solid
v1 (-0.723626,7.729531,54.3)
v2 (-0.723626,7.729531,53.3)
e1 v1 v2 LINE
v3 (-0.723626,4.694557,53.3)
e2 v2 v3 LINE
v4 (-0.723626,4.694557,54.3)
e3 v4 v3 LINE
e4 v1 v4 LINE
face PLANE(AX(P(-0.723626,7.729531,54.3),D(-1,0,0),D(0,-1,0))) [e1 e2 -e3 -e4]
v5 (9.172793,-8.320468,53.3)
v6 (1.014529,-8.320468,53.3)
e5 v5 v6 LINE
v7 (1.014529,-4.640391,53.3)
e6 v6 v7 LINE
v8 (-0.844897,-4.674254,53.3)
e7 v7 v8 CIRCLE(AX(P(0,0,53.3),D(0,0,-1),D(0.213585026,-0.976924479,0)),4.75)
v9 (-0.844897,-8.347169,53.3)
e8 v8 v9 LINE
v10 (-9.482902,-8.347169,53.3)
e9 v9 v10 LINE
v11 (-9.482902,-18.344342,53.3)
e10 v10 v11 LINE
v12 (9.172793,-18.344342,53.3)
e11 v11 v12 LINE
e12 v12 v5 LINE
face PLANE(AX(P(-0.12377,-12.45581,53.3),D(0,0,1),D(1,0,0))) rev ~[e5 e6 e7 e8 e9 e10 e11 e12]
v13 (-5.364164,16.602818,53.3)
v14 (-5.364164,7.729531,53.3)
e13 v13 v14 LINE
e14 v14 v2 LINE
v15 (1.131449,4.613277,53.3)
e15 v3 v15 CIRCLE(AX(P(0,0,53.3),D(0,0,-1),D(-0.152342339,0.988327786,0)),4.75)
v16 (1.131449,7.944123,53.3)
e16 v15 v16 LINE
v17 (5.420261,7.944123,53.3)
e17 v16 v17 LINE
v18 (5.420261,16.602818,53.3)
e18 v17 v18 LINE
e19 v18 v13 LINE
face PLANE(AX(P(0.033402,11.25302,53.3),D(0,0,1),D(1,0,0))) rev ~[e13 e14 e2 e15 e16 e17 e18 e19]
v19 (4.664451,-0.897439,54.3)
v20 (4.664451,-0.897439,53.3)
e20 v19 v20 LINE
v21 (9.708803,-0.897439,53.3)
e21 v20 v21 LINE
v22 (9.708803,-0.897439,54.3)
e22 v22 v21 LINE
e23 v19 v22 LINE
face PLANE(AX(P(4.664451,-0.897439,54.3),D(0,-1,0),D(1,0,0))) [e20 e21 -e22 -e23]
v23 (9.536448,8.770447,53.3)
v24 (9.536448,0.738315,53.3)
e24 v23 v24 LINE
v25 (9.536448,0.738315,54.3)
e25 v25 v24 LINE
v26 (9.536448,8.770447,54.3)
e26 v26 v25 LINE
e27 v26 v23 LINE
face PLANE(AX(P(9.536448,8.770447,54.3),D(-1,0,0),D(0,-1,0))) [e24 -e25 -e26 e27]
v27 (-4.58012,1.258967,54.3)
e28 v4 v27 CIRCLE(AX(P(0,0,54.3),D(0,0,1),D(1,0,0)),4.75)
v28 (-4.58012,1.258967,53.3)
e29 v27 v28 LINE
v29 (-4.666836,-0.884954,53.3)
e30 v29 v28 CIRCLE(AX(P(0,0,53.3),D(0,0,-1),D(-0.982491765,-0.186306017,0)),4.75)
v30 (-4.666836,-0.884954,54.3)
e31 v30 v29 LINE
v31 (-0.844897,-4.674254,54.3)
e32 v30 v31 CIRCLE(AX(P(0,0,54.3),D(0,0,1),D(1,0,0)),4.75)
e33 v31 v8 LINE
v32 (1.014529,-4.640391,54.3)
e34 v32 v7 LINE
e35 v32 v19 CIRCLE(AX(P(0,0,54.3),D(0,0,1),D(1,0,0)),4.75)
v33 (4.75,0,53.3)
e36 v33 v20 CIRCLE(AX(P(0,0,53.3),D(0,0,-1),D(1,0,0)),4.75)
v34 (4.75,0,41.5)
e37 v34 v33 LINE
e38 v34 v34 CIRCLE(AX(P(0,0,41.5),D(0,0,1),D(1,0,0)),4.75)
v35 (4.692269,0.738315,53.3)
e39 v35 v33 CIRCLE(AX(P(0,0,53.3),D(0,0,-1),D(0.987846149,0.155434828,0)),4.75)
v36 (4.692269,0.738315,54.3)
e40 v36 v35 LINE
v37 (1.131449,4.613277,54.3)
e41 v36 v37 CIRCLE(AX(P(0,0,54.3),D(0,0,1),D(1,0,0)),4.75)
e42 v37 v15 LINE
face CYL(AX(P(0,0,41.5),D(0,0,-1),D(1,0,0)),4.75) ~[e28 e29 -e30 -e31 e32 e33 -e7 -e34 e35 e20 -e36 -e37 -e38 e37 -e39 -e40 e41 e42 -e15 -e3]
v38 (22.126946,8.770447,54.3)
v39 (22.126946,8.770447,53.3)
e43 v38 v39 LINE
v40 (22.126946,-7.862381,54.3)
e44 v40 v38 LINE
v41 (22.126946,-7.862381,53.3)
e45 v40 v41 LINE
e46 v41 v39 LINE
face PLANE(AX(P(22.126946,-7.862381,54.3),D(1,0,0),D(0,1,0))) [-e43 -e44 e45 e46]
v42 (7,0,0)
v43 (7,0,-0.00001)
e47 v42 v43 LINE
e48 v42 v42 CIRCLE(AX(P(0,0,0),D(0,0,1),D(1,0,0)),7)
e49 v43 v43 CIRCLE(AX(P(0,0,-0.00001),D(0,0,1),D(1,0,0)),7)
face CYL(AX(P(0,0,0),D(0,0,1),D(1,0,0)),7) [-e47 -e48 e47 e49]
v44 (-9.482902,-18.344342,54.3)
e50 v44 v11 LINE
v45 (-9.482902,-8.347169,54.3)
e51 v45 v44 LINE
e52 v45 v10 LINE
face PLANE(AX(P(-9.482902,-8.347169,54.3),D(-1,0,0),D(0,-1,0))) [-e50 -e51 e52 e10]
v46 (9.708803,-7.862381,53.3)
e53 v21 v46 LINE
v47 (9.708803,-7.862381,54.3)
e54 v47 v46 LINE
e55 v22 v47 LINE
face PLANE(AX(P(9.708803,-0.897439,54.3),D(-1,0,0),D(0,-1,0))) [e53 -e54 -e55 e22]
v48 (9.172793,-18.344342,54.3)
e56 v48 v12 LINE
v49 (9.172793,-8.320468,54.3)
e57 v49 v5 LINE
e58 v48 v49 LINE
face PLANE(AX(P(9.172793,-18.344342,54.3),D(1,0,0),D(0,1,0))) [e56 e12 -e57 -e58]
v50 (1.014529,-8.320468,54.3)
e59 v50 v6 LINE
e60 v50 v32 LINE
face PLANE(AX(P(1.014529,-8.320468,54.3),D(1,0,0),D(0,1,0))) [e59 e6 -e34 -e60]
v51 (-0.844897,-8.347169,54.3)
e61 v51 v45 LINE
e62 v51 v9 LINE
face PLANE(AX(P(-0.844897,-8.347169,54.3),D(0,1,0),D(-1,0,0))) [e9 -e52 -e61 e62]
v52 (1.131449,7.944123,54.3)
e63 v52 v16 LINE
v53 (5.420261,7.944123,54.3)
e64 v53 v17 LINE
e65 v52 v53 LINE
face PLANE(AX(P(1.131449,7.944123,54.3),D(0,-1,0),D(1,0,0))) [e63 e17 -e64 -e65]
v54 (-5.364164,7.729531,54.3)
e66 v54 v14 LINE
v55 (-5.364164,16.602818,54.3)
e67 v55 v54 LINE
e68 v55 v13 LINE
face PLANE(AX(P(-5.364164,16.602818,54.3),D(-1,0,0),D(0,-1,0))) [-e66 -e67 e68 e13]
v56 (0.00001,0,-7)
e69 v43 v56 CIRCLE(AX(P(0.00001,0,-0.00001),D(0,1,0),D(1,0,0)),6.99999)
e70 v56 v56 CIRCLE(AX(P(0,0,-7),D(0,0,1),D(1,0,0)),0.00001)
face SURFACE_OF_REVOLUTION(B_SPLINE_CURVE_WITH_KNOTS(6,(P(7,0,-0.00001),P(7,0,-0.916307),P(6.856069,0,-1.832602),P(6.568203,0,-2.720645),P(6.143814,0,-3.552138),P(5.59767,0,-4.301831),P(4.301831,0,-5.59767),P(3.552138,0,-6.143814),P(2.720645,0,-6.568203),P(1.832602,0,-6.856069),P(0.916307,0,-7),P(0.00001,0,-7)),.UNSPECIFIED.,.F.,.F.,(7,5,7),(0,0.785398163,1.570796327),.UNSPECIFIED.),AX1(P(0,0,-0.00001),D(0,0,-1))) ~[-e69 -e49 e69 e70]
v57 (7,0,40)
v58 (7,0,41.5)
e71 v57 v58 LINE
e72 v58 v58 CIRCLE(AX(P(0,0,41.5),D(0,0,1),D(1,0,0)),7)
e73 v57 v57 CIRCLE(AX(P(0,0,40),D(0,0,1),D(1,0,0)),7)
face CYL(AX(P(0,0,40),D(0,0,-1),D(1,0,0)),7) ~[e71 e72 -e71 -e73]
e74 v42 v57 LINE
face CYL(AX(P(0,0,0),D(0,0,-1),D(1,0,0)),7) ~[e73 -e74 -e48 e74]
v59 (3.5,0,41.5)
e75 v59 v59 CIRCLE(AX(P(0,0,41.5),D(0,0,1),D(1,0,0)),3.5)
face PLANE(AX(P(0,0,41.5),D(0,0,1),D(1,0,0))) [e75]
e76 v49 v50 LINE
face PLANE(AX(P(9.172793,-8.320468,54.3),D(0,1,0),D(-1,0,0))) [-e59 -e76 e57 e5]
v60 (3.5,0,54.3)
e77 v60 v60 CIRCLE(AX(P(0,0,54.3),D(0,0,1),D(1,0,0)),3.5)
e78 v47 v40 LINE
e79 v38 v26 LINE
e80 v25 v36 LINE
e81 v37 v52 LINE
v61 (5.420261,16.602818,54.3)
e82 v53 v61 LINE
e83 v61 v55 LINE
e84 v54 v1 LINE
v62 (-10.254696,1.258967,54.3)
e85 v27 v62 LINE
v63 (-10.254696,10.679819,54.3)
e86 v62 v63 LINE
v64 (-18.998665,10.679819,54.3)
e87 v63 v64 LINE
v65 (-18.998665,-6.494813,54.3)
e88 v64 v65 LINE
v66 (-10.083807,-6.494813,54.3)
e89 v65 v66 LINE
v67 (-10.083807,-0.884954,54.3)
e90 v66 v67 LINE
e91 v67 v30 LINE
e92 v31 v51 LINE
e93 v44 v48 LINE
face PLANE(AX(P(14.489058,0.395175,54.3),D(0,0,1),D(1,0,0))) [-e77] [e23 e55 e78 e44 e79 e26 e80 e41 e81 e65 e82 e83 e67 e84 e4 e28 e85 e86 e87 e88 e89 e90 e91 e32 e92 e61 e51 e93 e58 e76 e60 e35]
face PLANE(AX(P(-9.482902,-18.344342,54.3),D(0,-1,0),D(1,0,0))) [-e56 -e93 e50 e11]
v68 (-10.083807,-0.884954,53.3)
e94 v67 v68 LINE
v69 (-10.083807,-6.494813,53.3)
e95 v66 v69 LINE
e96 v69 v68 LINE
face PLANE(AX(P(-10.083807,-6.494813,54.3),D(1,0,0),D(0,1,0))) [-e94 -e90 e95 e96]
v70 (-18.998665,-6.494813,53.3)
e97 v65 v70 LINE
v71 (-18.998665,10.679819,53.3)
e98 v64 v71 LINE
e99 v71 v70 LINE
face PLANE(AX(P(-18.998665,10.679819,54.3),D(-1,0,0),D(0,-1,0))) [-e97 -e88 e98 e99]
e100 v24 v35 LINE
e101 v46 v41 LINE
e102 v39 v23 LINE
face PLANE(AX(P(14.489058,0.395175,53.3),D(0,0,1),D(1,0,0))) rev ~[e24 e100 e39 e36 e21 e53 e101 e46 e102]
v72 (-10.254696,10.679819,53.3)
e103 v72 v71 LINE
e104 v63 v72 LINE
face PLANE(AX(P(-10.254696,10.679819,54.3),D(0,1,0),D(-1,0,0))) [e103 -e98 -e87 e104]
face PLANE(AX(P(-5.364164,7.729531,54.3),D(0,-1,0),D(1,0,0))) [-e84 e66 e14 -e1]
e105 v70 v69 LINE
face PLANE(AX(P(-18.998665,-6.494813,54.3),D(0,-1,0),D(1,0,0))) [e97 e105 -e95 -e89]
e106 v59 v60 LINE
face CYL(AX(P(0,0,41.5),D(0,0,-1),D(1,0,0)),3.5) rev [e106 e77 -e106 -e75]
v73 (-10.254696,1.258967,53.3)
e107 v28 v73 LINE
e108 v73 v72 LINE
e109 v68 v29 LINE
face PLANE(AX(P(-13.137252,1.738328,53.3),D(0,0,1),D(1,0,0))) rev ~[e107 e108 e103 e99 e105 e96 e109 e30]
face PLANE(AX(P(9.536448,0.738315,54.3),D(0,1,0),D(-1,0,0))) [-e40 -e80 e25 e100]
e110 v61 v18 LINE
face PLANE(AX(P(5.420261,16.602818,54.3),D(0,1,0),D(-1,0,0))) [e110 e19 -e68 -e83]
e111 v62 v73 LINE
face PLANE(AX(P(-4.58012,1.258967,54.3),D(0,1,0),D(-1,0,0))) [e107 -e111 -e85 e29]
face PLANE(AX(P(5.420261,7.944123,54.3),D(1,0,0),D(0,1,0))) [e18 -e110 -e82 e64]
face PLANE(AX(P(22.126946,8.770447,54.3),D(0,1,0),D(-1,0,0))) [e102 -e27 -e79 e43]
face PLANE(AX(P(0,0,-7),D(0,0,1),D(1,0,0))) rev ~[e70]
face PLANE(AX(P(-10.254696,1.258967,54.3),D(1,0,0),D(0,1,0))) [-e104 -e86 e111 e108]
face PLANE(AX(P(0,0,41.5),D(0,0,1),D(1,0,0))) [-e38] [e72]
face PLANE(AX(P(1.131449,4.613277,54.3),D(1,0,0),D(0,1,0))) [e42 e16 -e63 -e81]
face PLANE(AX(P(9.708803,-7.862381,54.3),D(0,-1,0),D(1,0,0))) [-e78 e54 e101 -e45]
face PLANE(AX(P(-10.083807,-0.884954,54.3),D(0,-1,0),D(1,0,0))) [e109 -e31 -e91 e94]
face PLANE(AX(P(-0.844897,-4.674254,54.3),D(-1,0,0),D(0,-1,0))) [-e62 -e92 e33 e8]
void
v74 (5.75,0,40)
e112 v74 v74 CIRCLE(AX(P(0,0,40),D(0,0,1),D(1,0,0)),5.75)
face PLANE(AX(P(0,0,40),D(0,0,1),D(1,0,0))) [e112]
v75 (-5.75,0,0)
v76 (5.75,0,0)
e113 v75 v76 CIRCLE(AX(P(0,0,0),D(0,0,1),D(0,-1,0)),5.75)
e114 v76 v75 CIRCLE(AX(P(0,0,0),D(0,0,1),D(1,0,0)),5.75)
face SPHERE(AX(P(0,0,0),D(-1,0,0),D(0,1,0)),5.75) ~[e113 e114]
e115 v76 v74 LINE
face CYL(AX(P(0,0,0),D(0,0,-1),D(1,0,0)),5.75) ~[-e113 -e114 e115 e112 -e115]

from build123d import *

# Parameters (mm, degrees)
F0_R      = 7
F1_DEPTH  = 7
F2_R      = 6.99999
F5_DEPTH  = 40
F6_R      = 7
F6_R_2    = 5.75
F7_DEPTH  = 1.5
F8_R      = 4.75
F8_R_2    = 3.5
F9_DEPTH  = 12.8
F11_DEPTH = 1


# Not quite as in the source:
# - a fillet or chamfer is up to 0.001 mm smaller than in the source, because OpenCascade refuses the exact size


with BuildPart() as f1:
    # F0 (on Top) → F1 (new body)
    with BuildSketch(Plane.XY):
        Circle(F0_R)
    extrude(amount=-F1_DEPTH)

    # F2 (radius 7 in the source; OpenCascade refuses exactly that, so slightly less here)
    f2_edges = [f1.edges().sort_by_distance(p)[0] for p in [
        (-7, 0, -7),
    ]]
    fillet(f2_edges, radius=F2_R)

    # F3 (on face) → F4 (revolve, cut)
    with BuildSketch(Plane.XY):
        with BuildLine():
            Line((-5.75, 0), (5.75, 0))
            ThreePointArc((5.75, 0), (0, 5.75), (-5.75, 0))
        make_face()
    revolve(axis=Axis((0, 0, 0), (1, 0, 0)), mode=Mode.SUBTRACT)

    # F5 (add): a face of the model
    f5_faces = [f1.faces().sort_by_distance(p)[0] for p in [
        (-6.8020101013, 0, 0),
    ]]
    extrude(f5_faces, amount=F5_DEPTH)

    # F6 (on face) → F7 (join)
    with BuildSketch(Plane.XY.offset(40)):
        Circle(F6_R)
        Circle(F6_R_2, mode=Mode.SUBTRACT)
        Circle(F6_R_2)
    extrude(amount=F7_DEPTH)

    # F8 (on face) → F9 (join)
    with BuildSketch(Plane.XY.offset(41.5)):
        Circle(F8_R)
        Circle(F8_R_2, mode=Mode.SUBTRACT)
    extrude(amount=F9_DEPTH)

    # F10 (on face) → F11 (join)
    with BuildSketch(Plane.XY.offset(54.3)):
        with BuildLine():
            ThreePointArc((-4.6668358831, -0.8849535807), (-4.7461193146, 0.1919673186), (-4.5801202528, 1.2589672237))
            Line((-4.5801202528, 1.2589672237), (-10.254695956, 1.2589672237))
            Line((-10.254695956, 1.2589672237), (-10.254695956, 10.6798189955))
            Line((-10.254695956, 10.6798189955), (-18.9986647217, 10.6798189955))
            Line((-18.9986647217, 10.6798189955), (-18.9986647217, -6.4948128273))
            Line((-18.9986647217, -6.4948128273), (-10.0838066189, -6.4948128273))
            Line((-10.0838066189, -6.4948128273), (-10.0838066189, -0.8849535807))
            Line((-10.0838066189, -0.8849535807), (-4.6668358831, -0.8849535807))
        make_face()
        with BuildLine():
            Line((-0.7236261107, 7.7295311092), (-0.7236261107, 4.6945569814))
            ThreePointArc((-0.7236261107, 4.6945569814), (0.2079220104, 4.7454471273), (1.1314493255, 4.6132767556))
            Line((1.1314493255, 4.6132767556), (1.1314493255, 7.9441230255))
            Line((1.1314493255, 7.9441230255), (5.4202612606, 7.9441230255))
            Line((5.4202612606, 7.9441230255), (5.4202612606, 16.6028177181))
            Line((5.4202612606, 16.6028177181), (-5.3641636993, 16.6028177181))
            Line((-5.3641636993, 16.6028177181), (-5.3641636993, 7.7295311092))
            Line((-5.3641636993, 7.7295311092), (-0.7236261107, 7.7295311092))
        make_face()
        with BuildLine():
            Line((9.5364480238, 0.7383154319), (4.6922692083, 0.7383154319))
            ThreePointArc((4.6922692083, 0.7383154319), (4.7355453086, 0.3702845262), (4.75, 0))
            ThreePointArc((4.75, 0), (4.7285644054, -0.4507534407), (4.6644510887, -0.8974386001))
            Line((4.6644510887, -0.8974386001), (9.7088032833, -0.8974386001))
            Line((9.7088032833, -0.8974386001), (9.7088032833, -7.8623809823))
            Line((9.7088032833, -7.8623809823), (22.1269458032, -7.8623809823))
            Line((22.1269458032, -7.8623809823), (22.1269458032, -5.6407864176))
            Line((22.1269458032, -5.6407864176), (22.1269458032, 8.7704470205))
            Line((22.1269458032, 8.7704470205), (9.5364480238, 8.7704470205))
            Line((9.5364480238, 8.7704470205), (9.5364480238, 0.7383154319))
        make_face()
        with BuildLine():
            ThreePointArc((1.0145288717, -4.6403912732), (0.0864892709, -4.7492125248), (-0.8448971996, -4.6742538145))
            Line((-0.8448971996, -4.6742538145), (-0.8448971996, -8.3471687661))
            Line((-0.8448971996, -8.3471687661), (-9.48290206, -8.3471687661))
            Line((-9.48290206, -8.3471687661), (-9.48290206, -18.3443419333))
            Line((-9.48290206, -18.3443419333), (9.1727929611, -18.3443419333))
            Line((9.1727929611, -18.3443419333), (9.1727929611, -8.3204683216))
            Line((9.1727929611, -8.3204683216), (1.0145288717, -8.3204683216))
            Line((1.0145288717, -8.3204683216), (1.0145288717, -4.6403912732))
        make_face()
    extrude(amount=-F11_DEPTH)


solid = f1.part
